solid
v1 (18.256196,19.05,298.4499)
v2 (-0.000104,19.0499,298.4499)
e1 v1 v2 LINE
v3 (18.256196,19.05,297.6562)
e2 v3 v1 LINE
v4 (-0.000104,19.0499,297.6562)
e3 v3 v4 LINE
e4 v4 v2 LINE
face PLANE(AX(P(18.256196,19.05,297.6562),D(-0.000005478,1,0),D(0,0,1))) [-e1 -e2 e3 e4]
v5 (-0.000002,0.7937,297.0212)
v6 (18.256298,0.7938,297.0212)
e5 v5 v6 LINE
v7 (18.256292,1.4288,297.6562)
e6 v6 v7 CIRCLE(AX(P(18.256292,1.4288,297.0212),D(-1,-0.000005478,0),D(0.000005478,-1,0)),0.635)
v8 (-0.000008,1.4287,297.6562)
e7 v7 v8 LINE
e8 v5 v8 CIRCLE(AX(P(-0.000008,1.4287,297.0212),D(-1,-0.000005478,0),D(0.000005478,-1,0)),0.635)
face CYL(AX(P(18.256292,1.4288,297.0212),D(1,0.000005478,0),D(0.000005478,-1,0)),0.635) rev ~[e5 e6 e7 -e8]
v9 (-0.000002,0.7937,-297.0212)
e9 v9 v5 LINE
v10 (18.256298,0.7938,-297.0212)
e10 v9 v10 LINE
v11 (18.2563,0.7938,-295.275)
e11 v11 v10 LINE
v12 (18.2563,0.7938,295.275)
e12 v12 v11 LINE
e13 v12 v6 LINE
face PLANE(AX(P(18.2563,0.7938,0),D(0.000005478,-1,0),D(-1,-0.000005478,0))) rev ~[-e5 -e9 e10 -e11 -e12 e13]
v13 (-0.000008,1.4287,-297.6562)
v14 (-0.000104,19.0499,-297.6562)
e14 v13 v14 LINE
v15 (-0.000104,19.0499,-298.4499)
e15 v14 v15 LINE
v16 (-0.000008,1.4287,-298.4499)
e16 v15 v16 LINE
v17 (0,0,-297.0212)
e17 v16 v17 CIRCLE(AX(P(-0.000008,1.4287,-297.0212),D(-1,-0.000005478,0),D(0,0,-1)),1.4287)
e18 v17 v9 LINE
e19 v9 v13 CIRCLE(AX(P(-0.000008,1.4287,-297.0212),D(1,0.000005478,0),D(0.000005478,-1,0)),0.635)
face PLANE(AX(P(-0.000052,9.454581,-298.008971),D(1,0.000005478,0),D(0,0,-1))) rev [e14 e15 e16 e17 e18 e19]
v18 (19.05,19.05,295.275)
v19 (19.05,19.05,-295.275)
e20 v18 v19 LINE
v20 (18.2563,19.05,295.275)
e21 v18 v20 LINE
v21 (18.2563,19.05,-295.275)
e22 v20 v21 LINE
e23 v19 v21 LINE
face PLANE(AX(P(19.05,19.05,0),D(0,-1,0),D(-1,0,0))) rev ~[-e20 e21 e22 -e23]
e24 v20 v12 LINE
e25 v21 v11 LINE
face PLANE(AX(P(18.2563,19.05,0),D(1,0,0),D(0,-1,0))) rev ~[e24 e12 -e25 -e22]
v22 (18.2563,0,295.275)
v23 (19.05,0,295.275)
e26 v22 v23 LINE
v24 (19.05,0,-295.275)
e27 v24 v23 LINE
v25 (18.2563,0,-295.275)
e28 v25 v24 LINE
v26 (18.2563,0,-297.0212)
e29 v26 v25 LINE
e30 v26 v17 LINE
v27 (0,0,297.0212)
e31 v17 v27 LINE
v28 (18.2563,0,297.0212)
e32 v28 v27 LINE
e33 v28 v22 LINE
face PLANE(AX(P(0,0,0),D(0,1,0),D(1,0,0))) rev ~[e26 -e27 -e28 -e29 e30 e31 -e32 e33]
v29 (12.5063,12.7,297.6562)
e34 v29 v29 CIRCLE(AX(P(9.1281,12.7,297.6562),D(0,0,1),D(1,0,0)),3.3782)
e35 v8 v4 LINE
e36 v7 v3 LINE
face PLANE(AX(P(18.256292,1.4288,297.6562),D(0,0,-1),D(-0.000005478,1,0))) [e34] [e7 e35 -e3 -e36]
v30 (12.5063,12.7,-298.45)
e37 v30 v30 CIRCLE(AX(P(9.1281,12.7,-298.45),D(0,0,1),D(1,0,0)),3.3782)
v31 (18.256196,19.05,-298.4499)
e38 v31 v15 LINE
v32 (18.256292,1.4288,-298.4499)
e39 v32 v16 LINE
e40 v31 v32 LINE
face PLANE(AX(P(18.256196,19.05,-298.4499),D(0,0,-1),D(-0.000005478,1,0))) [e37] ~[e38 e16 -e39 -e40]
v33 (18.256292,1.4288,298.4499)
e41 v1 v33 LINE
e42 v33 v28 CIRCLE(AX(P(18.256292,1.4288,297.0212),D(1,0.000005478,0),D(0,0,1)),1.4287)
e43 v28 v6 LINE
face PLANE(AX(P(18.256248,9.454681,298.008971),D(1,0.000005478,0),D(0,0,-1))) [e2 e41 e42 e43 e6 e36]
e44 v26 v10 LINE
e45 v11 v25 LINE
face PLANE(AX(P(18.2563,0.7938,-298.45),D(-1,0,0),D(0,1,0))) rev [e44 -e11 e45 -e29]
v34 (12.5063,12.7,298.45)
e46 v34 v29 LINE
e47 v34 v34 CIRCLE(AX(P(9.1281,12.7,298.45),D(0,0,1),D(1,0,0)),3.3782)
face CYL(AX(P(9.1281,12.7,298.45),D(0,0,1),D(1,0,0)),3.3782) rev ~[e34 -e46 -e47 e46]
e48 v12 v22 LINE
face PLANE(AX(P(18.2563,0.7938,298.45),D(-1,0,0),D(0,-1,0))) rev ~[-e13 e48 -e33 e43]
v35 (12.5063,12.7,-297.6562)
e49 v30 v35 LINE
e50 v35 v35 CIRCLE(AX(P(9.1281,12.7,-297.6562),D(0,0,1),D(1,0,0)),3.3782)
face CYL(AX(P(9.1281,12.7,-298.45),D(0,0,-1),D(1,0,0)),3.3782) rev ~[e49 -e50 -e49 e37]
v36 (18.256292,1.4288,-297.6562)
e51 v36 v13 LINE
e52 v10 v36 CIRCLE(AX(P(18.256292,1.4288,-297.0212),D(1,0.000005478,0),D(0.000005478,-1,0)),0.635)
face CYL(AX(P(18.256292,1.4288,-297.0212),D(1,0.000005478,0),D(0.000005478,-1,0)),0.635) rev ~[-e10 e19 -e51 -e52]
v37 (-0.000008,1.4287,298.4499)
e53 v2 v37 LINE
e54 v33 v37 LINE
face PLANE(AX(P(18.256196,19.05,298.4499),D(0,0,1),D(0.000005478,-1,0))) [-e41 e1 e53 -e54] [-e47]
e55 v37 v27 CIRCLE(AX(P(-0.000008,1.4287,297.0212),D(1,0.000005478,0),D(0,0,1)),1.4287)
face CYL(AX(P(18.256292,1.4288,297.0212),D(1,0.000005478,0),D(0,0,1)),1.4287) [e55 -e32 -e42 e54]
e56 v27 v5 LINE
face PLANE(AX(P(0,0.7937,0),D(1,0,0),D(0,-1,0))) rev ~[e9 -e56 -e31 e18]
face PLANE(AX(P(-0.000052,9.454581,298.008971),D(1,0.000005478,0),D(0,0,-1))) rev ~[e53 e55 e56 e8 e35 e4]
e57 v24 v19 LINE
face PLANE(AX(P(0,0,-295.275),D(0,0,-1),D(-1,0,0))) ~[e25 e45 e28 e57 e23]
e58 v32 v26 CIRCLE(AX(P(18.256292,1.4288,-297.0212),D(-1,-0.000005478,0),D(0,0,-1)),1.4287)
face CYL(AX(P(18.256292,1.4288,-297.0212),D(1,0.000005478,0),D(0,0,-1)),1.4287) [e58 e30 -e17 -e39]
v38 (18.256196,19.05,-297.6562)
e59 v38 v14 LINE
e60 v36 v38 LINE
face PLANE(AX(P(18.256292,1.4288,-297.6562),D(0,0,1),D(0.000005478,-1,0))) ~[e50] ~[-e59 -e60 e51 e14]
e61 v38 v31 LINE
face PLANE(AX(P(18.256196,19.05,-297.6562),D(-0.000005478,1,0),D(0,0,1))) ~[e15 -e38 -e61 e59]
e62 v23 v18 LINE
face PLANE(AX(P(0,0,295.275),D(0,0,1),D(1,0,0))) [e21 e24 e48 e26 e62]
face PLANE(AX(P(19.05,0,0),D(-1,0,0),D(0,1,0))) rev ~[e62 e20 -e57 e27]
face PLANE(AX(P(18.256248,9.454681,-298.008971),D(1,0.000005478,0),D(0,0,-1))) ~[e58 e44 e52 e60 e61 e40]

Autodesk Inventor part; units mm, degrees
ref_plane "YZ Plane" through (0, 0, 0) normal (1, 0, 0) x (0, 1, 0)
ref_plane "XZ Plane" through (0, 0, 0) normal (0, 1, 0) x (-1, 0, 0)
ref_plane "XY Plane" through (0, 0, 0) normal (0, 0, 1) x (1, 0, 0)
sketch "Sketch1" plane through (0, 0, 0) normal (0, 0, 1) x (1, 0, 0)
  line L0 (0, 0) -> (19.05, 0)
  line L1 (19.05, 0) -> (19.05, 19.05)
  line L2 (19.05, 19.05) -> (18.2563, 19.05)
  line L3 (18.2563, 19.05) -> (18.2563, 0.7938)
  line L4 (18.2563, 0.7938) -> (0, 0.7937)
  line L5 (0, 0.7937) -> (0, 0)
  dimension "d0" = 19.05
  dimension "d1" = 19.05
  dimension "d2" = 0.7937
extrude "Extrusion1" add sketch "Sketch1" along normal blind 298.45
sketch "Sketch2" plane through (0, 0, 298.45) normal (0, 0, 1) x (1, 0, 0)
  line L0 (0, 0) -> (19.05, 0) projected
  line L1 (19.05, 0) -> (19.05, 19.05) projected
  line L2 (19.05, 19.05) -> (18.2563, 19.05) projected
  line L3 (18.2563, 19.05) -> (18.2563, 0.7938) projected
  line L4 (18.2563, 0.7938) -> (18.2563, 0)
extrude "Extrusion2" cut sketch "Sketch2" against normal blind 3.175
sketch "Sketch3" plane through (18.2563, 0, 297.6562) normal (0, 0, 1) x (1, 0, 0)
  line L0 (-18.2563, 0) -> (0, 0)
  line L1 (0, 0) -> (0, 19.05)
  line L2 (0, 19.05) -> (-18.2563, 19.05)
  line L3 (-18.2563, 19.05) -> (-18.2563, 0)
edge flange "Flange1" height 19.05 angle 90 thickness 0.7937 bend radius 0.635 thickness toward (0, 0, 1) relief straight relief width 0.7937 relief depth 0.3969 edges at (9.1281, 0.7938, 298.45) wall of the first edge with corners at (0, 0, 297.6562) (18.2563, 0, 297.6562) (18.2562, 19.05, 297.6562) (0, 19.05, 297.6562)
bend "Bend1"
corner "Corner1"
sketch "Sketch4" plane through (0, 19.05, 298.45) normal (0, 0, 1) x (1, 0, 0)
  line L0 (18.2563, 0) -> (18.2563, -17.6213) projected
  line L1 (0, -17.6213) -> (0, 0) projected
  line L2 (0, -6.35) -> (18.2563, -6.35) construction
  circle A0 centre (9.1281, -6.35) radius 3.3782
  point P0 (0, -19.05)
  dimension "d17" = 12.7
  dimension "d18" = 6.7564
extrude "Extrusion3" cut sketch "Sketch4" against normal through all
mirror "Mirror1" about plane through (13.8989, 5.1511, 0) normal (0, 0, -1)
equation "\"d7\" = BendReliefWidth"
equation "\"d8\" = BendReliefDepth"
equation "\"d9\" = MinimumRemnant"
equation "\"d10\" = BendRadius"
equation "\"d14\" = CornerReliefSize"
equation "\"d15\" = GapSize"
equation "\"d16\" = JacobiRadiusSize"
equation "\"BendRadius\" = Thickness"
equation "\"BendReliefWidth\" = Thickness"
equation "\"BendReliefDepth\" = 0.5 * Thickness"
equation "\"CornerReliefSize\" = 4 * Thickness"
equation "\"MinimumRemnant\" = 2 * Thickness"
equation "\"TransitionRadius\" = BendRadius"
equation "\"JacobiRadiusSize\" = Thickness"
equation "\"GapSize\" = Thickness"
equation "\"Thickness\" = 0.79375"
properties part number "Chassis Back Electronics Protector Bar" material "Aluminum 6061"
